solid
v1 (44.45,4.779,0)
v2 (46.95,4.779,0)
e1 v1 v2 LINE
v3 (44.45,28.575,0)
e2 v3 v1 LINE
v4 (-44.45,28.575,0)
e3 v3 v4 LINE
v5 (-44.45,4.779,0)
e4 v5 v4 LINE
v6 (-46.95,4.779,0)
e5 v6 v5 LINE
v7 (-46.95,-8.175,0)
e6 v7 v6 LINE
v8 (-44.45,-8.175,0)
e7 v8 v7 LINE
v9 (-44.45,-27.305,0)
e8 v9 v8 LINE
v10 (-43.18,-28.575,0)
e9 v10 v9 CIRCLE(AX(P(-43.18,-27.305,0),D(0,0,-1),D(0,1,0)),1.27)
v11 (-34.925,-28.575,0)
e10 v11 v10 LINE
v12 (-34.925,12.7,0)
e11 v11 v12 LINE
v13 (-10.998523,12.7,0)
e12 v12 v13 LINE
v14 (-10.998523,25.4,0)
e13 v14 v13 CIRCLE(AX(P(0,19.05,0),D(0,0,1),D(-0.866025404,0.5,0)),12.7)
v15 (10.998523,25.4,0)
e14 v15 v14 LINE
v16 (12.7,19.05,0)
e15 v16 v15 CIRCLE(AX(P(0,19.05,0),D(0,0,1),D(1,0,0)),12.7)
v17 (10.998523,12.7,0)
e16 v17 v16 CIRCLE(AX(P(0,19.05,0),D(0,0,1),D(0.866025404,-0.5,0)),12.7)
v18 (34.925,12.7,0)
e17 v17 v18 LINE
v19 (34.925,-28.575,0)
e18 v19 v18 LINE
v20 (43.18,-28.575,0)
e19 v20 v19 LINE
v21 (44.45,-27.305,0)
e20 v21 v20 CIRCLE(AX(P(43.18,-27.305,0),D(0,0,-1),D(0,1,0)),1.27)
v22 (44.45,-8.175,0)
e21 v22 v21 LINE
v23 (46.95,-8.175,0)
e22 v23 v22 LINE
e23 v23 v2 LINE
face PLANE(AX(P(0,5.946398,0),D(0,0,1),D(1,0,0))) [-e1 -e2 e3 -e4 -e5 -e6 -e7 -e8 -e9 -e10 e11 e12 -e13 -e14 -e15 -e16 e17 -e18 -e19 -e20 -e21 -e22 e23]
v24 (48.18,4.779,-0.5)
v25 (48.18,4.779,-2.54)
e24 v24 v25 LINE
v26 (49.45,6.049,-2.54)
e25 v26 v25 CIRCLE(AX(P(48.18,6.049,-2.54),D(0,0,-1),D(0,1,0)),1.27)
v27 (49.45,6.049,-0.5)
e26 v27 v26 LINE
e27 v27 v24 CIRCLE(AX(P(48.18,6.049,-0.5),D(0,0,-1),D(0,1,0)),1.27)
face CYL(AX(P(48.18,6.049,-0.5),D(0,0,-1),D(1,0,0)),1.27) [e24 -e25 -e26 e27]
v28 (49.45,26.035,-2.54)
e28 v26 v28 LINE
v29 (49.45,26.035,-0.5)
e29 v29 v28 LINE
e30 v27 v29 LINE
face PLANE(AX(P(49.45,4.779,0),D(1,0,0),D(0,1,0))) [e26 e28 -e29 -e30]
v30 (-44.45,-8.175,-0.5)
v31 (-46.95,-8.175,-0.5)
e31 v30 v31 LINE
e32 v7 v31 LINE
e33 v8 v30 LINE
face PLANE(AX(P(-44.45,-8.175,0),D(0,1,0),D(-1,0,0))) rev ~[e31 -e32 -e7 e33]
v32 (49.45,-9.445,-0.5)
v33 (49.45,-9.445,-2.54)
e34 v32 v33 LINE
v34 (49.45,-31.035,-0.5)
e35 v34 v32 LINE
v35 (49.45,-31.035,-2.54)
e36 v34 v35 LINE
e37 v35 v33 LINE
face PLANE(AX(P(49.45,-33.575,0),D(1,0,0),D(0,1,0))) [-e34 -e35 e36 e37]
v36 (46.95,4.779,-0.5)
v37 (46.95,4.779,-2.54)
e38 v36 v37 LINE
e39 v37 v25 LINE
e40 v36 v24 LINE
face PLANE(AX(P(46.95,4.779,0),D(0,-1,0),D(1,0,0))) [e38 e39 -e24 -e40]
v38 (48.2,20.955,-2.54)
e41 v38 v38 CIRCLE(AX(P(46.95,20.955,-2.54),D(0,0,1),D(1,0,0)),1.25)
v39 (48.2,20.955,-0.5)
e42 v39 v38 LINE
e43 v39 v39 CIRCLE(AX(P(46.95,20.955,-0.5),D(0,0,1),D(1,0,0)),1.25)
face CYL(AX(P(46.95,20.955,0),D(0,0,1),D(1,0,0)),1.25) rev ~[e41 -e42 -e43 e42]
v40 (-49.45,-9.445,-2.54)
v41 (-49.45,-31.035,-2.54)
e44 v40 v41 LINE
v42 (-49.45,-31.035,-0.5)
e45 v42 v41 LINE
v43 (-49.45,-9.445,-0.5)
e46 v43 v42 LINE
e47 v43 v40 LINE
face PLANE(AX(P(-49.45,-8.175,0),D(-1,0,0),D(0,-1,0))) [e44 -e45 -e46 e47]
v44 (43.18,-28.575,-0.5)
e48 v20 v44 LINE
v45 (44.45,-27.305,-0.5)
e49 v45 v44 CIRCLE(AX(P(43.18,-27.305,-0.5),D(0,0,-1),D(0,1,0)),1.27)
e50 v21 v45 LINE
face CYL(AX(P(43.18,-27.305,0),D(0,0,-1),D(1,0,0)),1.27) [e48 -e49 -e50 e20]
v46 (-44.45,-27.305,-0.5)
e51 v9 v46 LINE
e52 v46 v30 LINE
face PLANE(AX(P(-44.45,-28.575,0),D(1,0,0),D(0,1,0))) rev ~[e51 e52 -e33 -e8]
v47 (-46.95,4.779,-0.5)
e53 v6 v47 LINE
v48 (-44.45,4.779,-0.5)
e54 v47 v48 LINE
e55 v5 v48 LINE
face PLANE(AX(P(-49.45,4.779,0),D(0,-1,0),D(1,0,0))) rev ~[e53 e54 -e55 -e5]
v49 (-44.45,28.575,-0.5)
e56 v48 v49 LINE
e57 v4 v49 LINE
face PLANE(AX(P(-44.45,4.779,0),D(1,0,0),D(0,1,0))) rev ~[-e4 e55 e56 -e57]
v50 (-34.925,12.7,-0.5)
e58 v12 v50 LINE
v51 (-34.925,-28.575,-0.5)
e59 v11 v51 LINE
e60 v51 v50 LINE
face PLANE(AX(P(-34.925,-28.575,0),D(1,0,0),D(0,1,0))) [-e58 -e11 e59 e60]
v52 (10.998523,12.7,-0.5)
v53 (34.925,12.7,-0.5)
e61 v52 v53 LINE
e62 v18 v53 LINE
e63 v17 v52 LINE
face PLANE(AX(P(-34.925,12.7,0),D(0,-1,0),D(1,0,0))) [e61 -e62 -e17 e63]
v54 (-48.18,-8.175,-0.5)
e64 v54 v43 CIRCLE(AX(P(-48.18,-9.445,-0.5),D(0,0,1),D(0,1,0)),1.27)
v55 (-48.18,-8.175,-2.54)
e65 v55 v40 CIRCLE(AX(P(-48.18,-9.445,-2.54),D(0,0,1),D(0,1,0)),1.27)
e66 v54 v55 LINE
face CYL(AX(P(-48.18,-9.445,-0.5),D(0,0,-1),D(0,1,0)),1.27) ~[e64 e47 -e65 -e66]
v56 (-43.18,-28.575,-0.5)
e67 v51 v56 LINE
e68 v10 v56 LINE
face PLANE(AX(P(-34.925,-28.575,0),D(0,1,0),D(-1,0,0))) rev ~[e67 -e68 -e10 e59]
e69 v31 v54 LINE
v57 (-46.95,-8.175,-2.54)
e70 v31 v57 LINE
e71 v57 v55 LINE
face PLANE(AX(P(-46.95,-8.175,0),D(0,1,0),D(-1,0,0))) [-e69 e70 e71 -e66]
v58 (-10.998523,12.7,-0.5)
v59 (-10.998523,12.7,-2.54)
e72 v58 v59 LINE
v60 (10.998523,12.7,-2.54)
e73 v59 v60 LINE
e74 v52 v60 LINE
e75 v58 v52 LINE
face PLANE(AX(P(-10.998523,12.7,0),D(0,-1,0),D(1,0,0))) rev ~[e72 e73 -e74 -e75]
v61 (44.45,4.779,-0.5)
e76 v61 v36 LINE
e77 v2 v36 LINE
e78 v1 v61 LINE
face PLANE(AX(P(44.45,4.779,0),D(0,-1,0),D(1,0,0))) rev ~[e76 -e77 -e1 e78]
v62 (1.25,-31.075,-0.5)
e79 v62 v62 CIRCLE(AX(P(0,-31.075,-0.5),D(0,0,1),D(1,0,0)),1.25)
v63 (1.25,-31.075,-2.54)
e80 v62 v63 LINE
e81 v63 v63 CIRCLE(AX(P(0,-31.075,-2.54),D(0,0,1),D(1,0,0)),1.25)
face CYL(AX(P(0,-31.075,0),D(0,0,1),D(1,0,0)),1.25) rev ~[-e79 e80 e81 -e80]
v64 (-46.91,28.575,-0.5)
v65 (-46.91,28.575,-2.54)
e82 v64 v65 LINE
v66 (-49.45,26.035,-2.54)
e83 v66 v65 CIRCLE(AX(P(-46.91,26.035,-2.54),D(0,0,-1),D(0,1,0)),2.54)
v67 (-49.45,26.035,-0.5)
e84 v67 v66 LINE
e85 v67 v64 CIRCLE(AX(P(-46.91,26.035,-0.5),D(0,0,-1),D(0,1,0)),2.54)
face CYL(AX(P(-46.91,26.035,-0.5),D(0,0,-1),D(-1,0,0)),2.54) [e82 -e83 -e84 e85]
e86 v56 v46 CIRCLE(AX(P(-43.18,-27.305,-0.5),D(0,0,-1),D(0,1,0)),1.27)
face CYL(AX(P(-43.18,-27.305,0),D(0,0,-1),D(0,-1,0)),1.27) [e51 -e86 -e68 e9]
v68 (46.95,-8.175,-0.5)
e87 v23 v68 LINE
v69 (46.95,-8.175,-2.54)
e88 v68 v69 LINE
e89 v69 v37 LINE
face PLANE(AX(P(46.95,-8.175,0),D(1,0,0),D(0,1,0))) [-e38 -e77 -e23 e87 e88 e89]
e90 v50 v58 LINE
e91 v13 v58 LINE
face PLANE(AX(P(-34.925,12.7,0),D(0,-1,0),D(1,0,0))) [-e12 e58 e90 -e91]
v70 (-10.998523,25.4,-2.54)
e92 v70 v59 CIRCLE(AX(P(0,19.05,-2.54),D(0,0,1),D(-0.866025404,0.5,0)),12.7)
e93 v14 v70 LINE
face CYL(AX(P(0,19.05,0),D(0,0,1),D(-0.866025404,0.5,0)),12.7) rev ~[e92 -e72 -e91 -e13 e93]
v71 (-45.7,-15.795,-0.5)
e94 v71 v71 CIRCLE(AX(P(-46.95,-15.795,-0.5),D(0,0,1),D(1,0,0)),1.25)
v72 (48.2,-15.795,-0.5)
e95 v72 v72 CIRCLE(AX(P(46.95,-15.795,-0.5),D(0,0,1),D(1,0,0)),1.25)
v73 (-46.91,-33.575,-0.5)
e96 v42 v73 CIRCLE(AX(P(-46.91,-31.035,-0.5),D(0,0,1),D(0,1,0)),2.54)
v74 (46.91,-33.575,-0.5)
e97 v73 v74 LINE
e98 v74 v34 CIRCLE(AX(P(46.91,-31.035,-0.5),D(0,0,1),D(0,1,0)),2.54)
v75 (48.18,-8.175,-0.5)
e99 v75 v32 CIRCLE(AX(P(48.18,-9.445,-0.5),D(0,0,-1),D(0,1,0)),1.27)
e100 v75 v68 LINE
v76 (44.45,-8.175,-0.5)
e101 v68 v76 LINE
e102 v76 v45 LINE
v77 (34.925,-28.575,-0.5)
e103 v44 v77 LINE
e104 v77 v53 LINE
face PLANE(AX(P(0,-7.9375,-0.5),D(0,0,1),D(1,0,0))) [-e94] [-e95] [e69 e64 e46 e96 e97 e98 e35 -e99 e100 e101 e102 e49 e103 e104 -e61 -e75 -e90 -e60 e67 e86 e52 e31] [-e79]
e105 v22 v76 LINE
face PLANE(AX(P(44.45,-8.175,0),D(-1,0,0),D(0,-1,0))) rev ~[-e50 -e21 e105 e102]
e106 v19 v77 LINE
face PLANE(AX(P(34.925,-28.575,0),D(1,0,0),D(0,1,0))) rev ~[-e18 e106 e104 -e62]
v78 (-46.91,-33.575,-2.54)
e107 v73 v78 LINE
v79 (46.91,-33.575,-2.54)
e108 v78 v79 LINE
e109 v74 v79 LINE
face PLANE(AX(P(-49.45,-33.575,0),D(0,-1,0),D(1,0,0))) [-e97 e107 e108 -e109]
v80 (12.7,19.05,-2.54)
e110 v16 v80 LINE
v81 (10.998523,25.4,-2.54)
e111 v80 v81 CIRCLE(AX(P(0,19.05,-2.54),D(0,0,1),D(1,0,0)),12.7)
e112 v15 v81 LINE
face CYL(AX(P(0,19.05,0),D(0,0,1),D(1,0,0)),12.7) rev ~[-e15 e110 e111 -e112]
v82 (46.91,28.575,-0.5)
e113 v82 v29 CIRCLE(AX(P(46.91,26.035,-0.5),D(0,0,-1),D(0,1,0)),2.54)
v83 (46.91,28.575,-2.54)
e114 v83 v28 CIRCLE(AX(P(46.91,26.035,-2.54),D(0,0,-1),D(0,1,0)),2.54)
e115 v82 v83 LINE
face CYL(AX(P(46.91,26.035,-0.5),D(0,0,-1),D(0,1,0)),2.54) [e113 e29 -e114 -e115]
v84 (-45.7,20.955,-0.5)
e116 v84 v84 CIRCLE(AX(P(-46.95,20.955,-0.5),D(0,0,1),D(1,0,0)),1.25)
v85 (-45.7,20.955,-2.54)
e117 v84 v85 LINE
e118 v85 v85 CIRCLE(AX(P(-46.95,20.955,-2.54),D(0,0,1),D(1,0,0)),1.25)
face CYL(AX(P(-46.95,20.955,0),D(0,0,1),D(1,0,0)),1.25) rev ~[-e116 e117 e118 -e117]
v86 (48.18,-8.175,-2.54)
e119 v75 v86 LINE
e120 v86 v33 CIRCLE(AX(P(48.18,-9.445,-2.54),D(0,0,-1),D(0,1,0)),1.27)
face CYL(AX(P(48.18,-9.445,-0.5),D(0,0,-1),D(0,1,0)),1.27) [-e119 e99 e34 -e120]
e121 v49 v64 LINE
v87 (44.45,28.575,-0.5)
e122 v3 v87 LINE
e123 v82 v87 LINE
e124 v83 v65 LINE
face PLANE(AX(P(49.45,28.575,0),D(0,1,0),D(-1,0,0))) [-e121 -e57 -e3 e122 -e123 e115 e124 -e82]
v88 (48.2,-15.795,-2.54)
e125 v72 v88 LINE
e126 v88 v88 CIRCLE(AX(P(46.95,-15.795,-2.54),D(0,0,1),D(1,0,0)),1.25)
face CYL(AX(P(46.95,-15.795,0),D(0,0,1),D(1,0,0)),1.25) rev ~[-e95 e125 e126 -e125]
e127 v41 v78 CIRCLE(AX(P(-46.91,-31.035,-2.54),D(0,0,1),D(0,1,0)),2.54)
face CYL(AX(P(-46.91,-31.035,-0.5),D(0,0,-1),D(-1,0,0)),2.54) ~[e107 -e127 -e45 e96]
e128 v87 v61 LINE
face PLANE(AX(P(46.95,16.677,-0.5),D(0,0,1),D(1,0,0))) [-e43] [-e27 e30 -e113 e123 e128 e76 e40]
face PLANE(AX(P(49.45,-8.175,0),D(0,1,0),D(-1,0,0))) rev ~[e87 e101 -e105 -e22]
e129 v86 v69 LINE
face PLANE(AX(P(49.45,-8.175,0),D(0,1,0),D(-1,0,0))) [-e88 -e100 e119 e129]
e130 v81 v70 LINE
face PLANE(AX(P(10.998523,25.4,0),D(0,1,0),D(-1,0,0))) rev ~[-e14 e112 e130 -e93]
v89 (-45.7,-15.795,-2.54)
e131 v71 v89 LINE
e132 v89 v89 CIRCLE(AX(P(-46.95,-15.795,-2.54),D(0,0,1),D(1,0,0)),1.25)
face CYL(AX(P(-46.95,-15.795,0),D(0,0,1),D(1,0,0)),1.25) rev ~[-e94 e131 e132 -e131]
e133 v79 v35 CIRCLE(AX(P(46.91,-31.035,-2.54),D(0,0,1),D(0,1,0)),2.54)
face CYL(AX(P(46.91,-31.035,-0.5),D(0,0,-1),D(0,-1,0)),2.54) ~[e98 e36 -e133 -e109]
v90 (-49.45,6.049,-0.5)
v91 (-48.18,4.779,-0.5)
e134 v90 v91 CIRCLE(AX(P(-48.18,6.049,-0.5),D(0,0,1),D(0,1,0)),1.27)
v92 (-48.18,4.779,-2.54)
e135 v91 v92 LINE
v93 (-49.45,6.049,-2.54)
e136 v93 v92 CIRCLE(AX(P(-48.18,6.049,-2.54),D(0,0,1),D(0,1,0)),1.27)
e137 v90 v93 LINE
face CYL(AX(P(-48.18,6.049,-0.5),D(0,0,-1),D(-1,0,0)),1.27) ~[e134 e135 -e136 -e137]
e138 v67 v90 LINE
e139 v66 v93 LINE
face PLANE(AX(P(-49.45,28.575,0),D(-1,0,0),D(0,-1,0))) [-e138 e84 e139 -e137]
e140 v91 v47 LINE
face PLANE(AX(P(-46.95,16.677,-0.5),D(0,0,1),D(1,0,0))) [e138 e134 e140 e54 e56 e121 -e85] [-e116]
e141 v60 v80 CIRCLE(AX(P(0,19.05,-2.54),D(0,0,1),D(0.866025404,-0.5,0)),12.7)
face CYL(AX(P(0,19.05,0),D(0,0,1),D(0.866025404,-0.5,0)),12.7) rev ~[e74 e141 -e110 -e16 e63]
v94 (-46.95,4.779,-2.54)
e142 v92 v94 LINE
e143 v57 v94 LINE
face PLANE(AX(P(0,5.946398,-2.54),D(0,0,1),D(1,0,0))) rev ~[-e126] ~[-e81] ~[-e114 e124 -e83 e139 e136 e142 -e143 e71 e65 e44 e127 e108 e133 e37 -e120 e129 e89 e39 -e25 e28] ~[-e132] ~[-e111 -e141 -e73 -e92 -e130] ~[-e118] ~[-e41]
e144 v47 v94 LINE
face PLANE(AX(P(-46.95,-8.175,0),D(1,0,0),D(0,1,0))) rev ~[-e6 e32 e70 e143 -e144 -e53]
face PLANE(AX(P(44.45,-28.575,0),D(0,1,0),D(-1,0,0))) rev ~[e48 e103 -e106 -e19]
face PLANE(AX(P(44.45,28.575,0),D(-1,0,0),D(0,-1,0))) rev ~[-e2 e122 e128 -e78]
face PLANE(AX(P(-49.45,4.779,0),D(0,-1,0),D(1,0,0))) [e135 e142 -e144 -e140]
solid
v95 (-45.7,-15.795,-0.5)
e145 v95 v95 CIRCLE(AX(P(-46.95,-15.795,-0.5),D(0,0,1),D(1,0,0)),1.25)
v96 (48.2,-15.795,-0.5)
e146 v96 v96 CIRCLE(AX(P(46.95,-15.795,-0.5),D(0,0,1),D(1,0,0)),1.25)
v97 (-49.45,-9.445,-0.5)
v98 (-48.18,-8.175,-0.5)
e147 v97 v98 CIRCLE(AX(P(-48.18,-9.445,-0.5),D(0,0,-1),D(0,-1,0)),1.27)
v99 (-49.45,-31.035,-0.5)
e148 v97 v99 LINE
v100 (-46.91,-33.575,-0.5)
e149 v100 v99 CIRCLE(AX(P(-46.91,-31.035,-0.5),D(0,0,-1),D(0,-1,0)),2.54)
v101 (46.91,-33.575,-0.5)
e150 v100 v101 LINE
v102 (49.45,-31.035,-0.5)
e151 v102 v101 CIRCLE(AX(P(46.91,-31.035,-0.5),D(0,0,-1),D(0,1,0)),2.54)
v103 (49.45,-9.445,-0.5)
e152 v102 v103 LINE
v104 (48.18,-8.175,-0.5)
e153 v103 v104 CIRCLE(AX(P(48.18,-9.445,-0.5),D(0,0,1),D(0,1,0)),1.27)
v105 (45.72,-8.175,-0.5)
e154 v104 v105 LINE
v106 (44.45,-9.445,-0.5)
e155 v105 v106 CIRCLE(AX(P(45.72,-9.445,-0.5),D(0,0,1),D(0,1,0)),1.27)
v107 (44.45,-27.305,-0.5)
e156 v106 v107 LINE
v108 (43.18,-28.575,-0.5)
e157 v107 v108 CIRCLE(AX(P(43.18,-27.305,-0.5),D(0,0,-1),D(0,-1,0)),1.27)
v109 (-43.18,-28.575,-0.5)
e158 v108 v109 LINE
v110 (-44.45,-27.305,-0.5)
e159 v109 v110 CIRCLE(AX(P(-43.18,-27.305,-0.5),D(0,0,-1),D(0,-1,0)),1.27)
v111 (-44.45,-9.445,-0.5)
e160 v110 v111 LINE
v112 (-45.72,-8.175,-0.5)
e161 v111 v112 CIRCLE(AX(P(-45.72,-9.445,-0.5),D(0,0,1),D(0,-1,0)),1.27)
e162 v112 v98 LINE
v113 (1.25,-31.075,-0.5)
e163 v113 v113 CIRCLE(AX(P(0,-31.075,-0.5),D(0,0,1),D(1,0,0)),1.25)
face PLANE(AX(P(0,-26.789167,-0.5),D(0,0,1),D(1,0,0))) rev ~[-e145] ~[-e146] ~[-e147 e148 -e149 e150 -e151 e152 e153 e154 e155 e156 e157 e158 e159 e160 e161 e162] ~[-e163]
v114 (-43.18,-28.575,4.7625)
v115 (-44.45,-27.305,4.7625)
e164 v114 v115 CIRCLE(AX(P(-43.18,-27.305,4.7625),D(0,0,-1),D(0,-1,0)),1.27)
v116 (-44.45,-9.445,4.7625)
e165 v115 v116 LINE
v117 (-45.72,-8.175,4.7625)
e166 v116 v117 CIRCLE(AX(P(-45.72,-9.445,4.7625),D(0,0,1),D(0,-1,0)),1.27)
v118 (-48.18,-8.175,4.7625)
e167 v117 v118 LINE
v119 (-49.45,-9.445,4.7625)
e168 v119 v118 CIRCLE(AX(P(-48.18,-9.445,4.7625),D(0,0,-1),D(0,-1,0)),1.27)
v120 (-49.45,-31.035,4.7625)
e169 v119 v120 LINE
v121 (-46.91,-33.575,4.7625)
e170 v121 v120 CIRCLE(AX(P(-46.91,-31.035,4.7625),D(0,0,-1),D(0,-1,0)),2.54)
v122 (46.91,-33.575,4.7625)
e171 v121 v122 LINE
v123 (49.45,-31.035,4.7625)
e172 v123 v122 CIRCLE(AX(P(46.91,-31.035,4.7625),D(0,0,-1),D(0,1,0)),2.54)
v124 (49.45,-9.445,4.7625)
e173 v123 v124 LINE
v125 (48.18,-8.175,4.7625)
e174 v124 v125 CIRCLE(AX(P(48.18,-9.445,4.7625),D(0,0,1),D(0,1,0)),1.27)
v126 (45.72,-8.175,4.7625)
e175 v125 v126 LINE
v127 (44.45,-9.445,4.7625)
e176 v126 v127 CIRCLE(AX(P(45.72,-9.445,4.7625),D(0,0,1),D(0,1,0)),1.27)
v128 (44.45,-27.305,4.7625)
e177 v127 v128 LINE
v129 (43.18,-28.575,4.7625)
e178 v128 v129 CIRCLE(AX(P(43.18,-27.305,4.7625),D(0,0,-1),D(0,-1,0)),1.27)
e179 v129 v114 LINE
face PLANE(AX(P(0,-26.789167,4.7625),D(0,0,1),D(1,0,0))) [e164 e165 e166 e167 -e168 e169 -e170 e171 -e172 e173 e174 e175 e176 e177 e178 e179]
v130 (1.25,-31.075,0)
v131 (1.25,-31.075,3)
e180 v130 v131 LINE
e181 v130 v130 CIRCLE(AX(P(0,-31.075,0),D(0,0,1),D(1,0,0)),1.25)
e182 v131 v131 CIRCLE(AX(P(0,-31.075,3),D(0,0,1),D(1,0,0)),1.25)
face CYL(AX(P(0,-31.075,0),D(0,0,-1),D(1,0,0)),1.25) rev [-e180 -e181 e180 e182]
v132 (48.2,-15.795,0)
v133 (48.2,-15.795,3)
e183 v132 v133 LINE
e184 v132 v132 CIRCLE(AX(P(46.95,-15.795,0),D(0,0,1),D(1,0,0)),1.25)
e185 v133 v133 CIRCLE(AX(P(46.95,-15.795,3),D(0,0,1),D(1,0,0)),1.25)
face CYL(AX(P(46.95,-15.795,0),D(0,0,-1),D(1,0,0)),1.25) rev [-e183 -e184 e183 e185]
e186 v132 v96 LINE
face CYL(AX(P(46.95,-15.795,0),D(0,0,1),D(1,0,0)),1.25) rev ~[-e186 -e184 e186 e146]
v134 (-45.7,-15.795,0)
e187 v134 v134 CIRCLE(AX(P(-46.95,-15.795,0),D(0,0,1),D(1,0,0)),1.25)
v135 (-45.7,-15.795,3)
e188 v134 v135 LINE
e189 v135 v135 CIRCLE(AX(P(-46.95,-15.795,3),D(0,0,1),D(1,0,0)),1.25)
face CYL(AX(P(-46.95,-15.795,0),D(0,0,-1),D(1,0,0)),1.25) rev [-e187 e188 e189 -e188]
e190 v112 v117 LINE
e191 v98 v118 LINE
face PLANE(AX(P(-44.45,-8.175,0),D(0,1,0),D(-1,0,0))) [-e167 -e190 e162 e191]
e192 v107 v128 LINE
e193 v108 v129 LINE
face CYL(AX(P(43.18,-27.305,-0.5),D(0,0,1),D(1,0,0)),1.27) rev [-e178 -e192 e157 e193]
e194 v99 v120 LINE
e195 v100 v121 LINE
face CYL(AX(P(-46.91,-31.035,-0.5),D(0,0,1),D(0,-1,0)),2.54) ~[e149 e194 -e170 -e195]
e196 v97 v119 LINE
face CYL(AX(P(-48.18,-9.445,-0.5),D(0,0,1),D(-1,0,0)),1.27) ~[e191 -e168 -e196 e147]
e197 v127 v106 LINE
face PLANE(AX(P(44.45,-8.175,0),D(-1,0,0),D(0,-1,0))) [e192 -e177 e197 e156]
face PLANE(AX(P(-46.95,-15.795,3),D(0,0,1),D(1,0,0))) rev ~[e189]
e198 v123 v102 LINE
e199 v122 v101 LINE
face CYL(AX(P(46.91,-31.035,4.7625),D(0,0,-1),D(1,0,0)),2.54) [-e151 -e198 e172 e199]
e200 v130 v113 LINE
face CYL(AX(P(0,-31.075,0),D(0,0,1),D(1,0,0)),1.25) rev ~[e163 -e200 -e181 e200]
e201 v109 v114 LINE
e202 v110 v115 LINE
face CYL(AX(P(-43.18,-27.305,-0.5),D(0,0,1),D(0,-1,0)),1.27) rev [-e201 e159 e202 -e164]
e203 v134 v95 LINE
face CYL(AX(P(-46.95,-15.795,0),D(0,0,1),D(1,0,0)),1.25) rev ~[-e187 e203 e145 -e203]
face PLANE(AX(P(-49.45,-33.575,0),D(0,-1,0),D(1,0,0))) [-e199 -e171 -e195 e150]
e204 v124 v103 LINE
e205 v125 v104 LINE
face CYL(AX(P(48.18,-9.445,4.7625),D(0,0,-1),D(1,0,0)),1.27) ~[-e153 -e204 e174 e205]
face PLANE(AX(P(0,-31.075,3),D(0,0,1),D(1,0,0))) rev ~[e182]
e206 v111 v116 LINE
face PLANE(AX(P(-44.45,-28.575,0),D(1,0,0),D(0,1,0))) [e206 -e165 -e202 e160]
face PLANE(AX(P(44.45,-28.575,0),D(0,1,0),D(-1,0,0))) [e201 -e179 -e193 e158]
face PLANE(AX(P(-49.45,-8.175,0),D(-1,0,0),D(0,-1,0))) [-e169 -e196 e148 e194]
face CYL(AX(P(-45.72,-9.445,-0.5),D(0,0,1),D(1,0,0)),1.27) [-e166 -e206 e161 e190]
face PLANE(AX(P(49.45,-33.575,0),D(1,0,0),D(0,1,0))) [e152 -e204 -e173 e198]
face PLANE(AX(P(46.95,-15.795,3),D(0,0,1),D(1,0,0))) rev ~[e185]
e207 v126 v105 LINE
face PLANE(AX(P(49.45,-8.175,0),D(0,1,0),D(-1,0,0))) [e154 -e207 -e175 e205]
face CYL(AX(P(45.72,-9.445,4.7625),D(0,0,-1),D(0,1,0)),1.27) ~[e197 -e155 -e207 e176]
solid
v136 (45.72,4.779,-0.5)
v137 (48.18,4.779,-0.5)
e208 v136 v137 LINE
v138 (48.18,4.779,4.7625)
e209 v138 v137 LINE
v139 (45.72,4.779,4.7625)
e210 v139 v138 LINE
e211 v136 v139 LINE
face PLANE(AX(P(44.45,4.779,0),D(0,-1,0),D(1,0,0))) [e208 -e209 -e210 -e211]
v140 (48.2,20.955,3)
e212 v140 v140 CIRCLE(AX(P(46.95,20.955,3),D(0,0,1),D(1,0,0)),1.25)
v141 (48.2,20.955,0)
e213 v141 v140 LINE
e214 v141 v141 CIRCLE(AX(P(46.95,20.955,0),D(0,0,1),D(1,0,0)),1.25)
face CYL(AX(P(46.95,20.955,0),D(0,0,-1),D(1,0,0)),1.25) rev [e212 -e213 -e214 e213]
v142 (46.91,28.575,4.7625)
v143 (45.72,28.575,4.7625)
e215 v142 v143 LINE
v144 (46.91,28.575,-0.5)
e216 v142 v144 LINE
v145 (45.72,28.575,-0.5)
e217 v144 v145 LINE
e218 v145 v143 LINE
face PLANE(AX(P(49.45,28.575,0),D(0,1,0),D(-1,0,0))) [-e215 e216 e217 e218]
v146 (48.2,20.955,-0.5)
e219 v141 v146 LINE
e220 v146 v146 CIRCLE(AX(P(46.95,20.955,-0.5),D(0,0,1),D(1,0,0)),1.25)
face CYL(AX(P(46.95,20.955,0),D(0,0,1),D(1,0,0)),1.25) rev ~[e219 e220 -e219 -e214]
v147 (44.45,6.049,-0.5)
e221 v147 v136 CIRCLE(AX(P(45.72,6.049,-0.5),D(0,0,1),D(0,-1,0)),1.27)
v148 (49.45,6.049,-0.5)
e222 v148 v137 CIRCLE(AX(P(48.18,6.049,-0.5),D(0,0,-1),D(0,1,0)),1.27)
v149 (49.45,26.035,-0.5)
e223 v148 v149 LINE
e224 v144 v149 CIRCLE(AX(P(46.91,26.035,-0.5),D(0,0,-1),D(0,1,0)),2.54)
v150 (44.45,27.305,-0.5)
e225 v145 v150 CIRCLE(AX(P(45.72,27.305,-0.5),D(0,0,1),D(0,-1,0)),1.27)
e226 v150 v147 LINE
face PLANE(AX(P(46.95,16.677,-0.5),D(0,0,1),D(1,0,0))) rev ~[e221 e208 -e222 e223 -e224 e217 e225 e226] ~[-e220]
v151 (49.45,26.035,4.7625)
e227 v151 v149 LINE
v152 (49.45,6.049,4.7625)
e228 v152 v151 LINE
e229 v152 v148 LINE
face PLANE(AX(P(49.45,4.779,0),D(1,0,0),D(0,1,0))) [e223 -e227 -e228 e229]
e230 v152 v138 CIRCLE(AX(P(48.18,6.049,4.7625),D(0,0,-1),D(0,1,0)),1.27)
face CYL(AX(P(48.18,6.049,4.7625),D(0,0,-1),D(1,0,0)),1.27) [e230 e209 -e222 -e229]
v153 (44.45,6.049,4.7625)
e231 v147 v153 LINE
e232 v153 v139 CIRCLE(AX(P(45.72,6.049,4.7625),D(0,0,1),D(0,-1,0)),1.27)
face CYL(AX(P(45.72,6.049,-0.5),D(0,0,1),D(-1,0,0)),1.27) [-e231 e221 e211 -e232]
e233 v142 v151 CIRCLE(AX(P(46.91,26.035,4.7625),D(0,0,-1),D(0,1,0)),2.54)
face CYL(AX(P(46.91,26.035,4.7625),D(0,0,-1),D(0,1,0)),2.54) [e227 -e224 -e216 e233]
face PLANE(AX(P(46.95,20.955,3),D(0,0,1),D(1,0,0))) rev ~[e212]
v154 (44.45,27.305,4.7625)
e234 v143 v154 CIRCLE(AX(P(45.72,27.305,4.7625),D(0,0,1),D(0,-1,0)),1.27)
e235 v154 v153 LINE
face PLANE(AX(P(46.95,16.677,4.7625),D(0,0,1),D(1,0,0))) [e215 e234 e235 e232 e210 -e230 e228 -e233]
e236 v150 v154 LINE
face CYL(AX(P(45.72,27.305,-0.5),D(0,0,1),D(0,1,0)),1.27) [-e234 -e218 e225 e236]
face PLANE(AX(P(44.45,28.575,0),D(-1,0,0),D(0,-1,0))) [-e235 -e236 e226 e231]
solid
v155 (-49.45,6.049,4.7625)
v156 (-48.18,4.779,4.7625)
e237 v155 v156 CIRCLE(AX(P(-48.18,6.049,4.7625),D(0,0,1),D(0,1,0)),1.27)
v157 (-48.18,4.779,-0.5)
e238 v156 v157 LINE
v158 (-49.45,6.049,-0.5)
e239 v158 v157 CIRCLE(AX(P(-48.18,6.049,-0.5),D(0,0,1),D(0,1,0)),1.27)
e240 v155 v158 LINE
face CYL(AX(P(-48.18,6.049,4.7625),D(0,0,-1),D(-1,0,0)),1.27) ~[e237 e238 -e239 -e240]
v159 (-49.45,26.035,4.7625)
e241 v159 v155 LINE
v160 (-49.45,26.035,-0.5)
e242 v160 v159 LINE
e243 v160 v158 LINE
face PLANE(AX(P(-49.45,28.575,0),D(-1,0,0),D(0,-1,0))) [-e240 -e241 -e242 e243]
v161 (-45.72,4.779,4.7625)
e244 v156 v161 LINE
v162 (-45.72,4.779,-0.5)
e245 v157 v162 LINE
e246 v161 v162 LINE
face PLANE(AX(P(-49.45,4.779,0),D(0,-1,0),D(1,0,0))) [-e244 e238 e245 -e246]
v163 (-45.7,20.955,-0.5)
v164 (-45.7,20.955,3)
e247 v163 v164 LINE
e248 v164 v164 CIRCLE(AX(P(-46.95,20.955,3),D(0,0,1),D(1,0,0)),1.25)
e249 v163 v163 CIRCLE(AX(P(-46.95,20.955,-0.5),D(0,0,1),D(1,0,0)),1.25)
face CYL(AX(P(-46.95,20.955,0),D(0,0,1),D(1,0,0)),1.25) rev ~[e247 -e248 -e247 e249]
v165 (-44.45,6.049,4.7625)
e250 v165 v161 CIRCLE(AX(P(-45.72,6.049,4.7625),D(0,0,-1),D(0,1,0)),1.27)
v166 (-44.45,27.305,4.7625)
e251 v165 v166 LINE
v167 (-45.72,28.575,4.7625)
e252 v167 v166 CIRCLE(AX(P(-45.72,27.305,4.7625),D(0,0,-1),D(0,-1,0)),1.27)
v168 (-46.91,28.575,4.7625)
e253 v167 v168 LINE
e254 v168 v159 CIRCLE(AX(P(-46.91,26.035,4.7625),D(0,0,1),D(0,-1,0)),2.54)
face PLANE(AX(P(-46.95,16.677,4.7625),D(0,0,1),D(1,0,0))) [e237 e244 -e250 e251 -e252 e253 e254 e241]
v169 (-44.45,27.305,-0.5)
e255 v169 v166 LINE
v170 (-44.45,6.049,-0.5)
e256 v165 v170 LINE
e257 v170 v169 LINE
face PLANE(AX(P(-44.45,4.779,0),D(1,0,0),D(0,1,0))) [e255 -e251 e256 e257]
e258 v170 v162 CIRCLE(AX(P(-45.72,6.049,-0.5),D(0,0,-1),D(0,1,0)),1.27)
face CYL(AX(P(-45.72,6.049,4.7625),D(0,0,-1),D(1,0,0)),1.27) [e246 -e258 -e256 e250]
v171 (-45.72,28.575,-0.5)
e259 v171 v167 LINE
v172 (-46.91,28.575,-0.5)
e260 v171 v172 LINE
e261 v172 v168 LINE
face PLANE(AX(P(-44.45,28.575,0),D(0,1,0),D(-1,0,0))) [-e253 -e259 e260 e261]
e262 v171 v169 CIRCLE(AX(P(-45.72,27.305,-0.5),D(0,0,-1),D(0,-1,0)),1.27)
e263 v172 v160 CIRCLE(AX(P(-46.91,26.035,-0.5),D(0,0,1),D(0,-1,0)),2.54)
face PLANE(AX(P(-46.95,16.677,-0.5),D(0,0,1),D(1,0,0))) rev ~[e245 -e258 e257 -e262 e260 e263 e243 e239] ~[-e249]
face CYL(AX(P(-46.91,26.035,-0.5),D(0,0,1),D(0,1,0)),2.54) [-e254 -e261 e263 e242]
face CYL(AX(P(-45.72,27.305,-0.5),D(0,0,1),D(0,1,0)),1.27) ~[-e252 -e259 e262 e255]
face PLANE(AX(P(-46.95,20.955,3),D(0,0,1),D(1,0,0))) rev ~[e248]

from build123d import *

# Parameters (mm, degrees)
F0_R     = 1.25
F0_W     = 2.5
F0_H     = 12.954
F0_W_2   = 69.85
F0_H_2   = 41.275
F1_DEPTH = 2.54
F2_DEPTH = 4.7625
F3_DEPTH = 0.5
F4_DEPTH = 0.5
F5_DEPTH = 3
F6_R     = 2.54
F6_2_R   = 2.54
F6_3_R   = 2.54
F6_4_R   = 2.54
F7_R     = 1.27
F7_2_R   = 1.27
F7_3_R   = 1.27
F7_4_R   = 1.27
F9_DEPTH = 2.541


with BuildPart() as f1:
    # F0 (on Top) → F1 (new body)
    with BuildSketch(Plane.XY):
        Polygon((44.45, 4.779), (44.45, 28.575), (-44.45, 28.575), (-44.45, 4.779), (-44.45, -8.175), (-44.45, -28.575), (-34.925, -28.575), (-34.925, 12.7), (34.925, 12.7), (34.925, -28.575), (44.45, -28.575), (44.45, -8.175), align=None)
        Polygon((-44.45, 4.779), (-44.45, 28.575), (-49.45, 28.575), (-49.45, 4.779), (-46.95, 4.779), align=None)
        with Locations((-46.95, 20.955)):
            Circle(F0_R, mode=Mode.SUBTRACT)
        Polygon((46.95, -8.175), (44.45, -8.175), (44.45, -28.575), (34.925, -28.575), (-34.925, -28.575), (-44.45, -28.575), (-44.45, -8.175), (-46.95, -8.175), (-49.45, -8.175), (-49.45, -33.575), (49.45, -33.575), (49.45, -8.175), align=None)
        with Locations((-46.95, -15.795)):
            Circle(F0_R, mode=Mode.SUBTRACT)
        with Locations((0, -31.075)):
            Circle(F0_R, mode=Mode.SUBTRACT)
        with Locations((46.95, -15.795)):
            Circle(F0_R, mode=Mode.SUBTRACT)
        with Locations((-45.7, -1.698)):
            Rectangle(F0_W, F0_H)
        with Locations((45.7, -1.698)):
            Rectangle(F0_W, F0_H)
        Polygon((49.45, 28.575), (44.45, 28.575), (44.45, 4.779), (46.95, 4.779), (49.45, 4.779), align=None)
        with Locations((46.95, 20.955)):
            Circle(F0_R, mode=Mode.SUBTRACT)
        with Locations((0, -7.9375)):
            Rectangle(F0_W_2, F0_H_2)
    extrude(amount=-F1_DEPTH)

    # F0 (on Top) → F3 (cut)
    with BuildSketch(Plane.XY):
        with Locations((0, -7.9375)):
            Rectangle(F0_W_2, F0_H_2)
        Polygon((46.95, -8.175), (44.45, -8.175), (44.45, -28.575), (34.925, -28.575), (-34.925, -28.575), (-44.45, -28.575), (-44.45, -8.175), (-46.95, -8.175), (-49.45, -8.175), (-49.45, -33.575), (49.45, -33.575), (49.45, -8.175), align=None)
        with Locations((-46.95, -15.795)):
            Circle(F0_R, mode=Mode.SUBTRACT)
        with Locations((0, -31.075)):
            Circle(F0_R, mode=Mode.SUBTRACT)
        with Locations((46.95, -15.795)):
            Circle(F0_R, mode=Mode.SUBTRACT)
        Polygon((49.45, 28.575), (44.45, 28.575), (44.45, 4.779), (46.95, 4.779), (49.45, 4.779), align=None)
        with Locations((46.95, 20.955)):
            Circle(F0_R, mode=Mode.SUBTRACT)
        Polygon((-44.45, 4.779), (-44.45, 28.575), (-49.45, 28.575), (-49.45, 4.779), (-46.95, 4.779), align=None)
        with Locations((-46.95, 20.955)):
            Circle(F0_R, mode=Mode.SUBTRACT)
    extrude(amount=-F3_DEPTH, mode=Mode.SUBTRACT)

    # F6
    f6_edges = [f1.edges().sort_by_distance(p)[0] for p in [
        (-49.45, -33.575, -1.52),
        (-49.45, 28.575, -1.52),
        (49.45, -33.575, -1.52),
        (49.45, 28.575, -1.52),
    ]]
    fillet(f6_edges, radius=F6_R)

    # F7
    f7_edges = [f1.edges().sort_by_distance(p)[0] for p in [
        (49.45, 4.779, -1.52),
        (49.45, -8.175, -1.52),
        (-49.45, 4.779, -1.52),
        (-49.45, -8.175, -1.52),
        (44.45, -28.575, -0.25),
        (-44.45, -28.575, -0.25),
    ]]
    fillet(f7_edges, radius=F7_R)

    # F8 (on face) → F9 (cut, through all)
    with BuildSketch(Plane.XY):
        with BuildLine():
            ThreePointArc((10.9985226281, 12.7), (12.2672579939, 15.7629981272), (12.7, 19.05))
            ThreePointArc((12.7, 19.05), (12.2672579939, 22.3370018728), (10.9985226281, 25.4))
            Line((10.9985226281, 25.4), (-10.9985226281, 25.4))
            ThreePointArc((-10.9985226281, 25.4), (-12.7, 19.05), (-10.9985226281, 12.7))
            Line((-10.9985226281, 12.7), (10.9985226281, 12.7))
        make_face()
    extrude(amount=-F9_DEPTH, mode=Mode.SUBTRACT)


with BuildPart() as f2:
    # F0 (on Top) → F2 (new body)
    with BuildSketch(Plane.XY):
        Polygon((-44.45, 4.779), (-44.45, 28.575), (-49.45, 28.575), (-49.45, 4.779), (-46.95, 4.779), align=None)
        with Locations((-46.95, 20.955)):
            Circle(F0_R, mode=Mode.SUBTRACT)
        with Locations((-46.95, 20.955)):
            Circle(F0_R)
    extrude(amount=F2_DEPTH)

    # F4#3 (add): a face of the model
    f4_3_faces = [f2.faces().sort_by_distance(p)[0] for p in [
        (-46.95, 16.677, 0),
    ]]
    extrude(f4_3_faces, amount=F4_DEPTH)


with BuildPart() as f2b:
    # F0 (on Top) → F2, piece 2 (new body)
    with BuildSketch(Plane.XY):
        Polygon((49.45, 28.575), (44.45, 28.575), (44.45, 4.779), (46.95, 4.779), (49.45, 4.779), align=None)
        with Locations((46.95, 20.955)):
            Circle(F0_R, mode=Mode.SUBTRACT)
        with Locations((46.95, 20.955)):
            Circle(F0_R)
    extrude(amount=F2_DEPTH)

    # F4#2 (add): a face of the model
    f4_2_faces = [f2b.faces().sort_by_distance(p)[0] for p in [
        (46.95, 16.677, 0),
    ]]
    extrude(f4_2_faces, amount=F4_DEPTH)


with BuildPart() as f2c:
    # F0 (on Top) → F2, piece 3 (new body)
    with BuildSketch(Plane.XY):
        Polygon((46.95, -8.175), (44.45, -8.175), (44.45, -28.575), (34.925, -28.575), (-34.925, -28.575), (-44.45, -28.575), (-44.45, -8.175), (-46.95, -8.175), (-49.45, -8.175), (-49.45, -33.575), (49.45, -33.575), (49.45, -8.175), align=None)
        with Locations((-46.95, -15.795)):
            Circle(F0_R, mode=Mode.SUBTRACT)
        with Locations((0, -31.075)):
            Circle(F0_R, mode=Mode.SUBTRACT)
        with Locations((46.95, -15.795)):
            Circle(F0_R, mode=Mode.SUBTRACT)
        with Locations((-46.95, -15.795)):
            Circle(F0_R)
        with Locations((0, -31.075)):
            Circle(F0_R)
        with Locations((46.95, -15.795)):
            Circle(F0_R)
    extrude(amount=F2_DEPTH)

    # F4 (add): a face of the model
    f4_faces = [f2c.faces().sort_by_distance(p)[0] for p in [
        (45.4710959798, -18.375, 0),
    ]]
    extrude(f4_faces, amount=F4_DEPTH)


with BuildPart() as f5_tool:
    # F0 (on Top) → F5 (new body, symmetric)
    with BuildSketch(Plane.XY):
        with Locations((-46.95, -15.795)):
            Circle(F0_R)
        with Locations((0, -31.075)):
            Circle(F0_R)
        with Locations((46.95, -15.795)):
            Circle(F0_R)
        with Locations((46.95, 20.955)):
            Circle(F0_R)
        with Locations((-46.95, 20.955)):
            Circle(F0_R)
    extrude(amount=F5_DEPTH, both=True)


with BuildPart() as f2_1:
    add(f2.part)

    # F5: cut by f5_tool
    add(f5_tool.part, mode=Mode.SUBTRACT)

    # F6#2
    f6_2_edges = [f2_1.edges().sort_by_distance(p)[0] for p in [
        (-49.45, 28.575, 2.13125),
    ]]
    fillet(f6_2_edges, radius=F6_2_R)

    # F7#2
    f7_2_edges = [f2_1.edges().sort_by_distance(p)[0] for p in [
        (-49.45, 4.779, 2.13125),
        (-44.45, 4.779, 2.13125),
        (-44.45, 28.575, 2.13125),
    ]]
    fillet(f7_2_edges, radius=F7_2_R)


with BuildPart() as f2b_1:
    add(f2b.part)

    # F5: cut by f5_tool
    add(f5_tool.part, mode=Mode.SUBTRACT)

    # F6#3
    f6_3_edges = [f2b_1.edges().sort_by_distance(p)[0] for p in [
        (49.45, 28.575, 2.13125),
    ]]
    fillet(f6_3_edges, radius=F6_3_R)

    # F7#3
    f7_3_edges = [f2b_1.edges().sort_by_distance(p)[0] for p in [
        (49.45, 4.779, 2.13125),
        (44.45, 4.779, 2.13125),
        (44.45, 28.575, 2.13125),
    ]]
    fillet(f7_3_edges, radius=F7_3_R)


with BuildPart() as f2c_1:
    add(f2c.part)

    # F5: cut by f5_tool
    add(f5_tool.part, mode=Mode.SUBTRACT)

    # F6#4
    f6_4_edges = [f2c_1.edges().sort_by_distance(p)[0] for p in [
        (-49.45, -33.575, 2.13125),
        (49.45, -33.575, 2.13125),
    ]]
    fillet(f6_4_edges, radius=F6_4_R)

    # F7#4
    f7_4_edges = [f2c_1.edges().sort_by_distance(p)[0] for p in [
        (49.45, -8.175, 2.13125),
        (-49.45, -8.175, 2.13125),
        (-44.45, -8.175, 2.13125),
        (44.45, -8.175, 2.13125),
        (-44.45, -28.575, 2.13125),
        (44.45, -28.575, 2.13125),
    ]]
    fillet(f7_4_edges, radius=F7_4_R)


solid = Compound([f1.part, f2_1.part, f2b_1.part, f2c_1.part])
